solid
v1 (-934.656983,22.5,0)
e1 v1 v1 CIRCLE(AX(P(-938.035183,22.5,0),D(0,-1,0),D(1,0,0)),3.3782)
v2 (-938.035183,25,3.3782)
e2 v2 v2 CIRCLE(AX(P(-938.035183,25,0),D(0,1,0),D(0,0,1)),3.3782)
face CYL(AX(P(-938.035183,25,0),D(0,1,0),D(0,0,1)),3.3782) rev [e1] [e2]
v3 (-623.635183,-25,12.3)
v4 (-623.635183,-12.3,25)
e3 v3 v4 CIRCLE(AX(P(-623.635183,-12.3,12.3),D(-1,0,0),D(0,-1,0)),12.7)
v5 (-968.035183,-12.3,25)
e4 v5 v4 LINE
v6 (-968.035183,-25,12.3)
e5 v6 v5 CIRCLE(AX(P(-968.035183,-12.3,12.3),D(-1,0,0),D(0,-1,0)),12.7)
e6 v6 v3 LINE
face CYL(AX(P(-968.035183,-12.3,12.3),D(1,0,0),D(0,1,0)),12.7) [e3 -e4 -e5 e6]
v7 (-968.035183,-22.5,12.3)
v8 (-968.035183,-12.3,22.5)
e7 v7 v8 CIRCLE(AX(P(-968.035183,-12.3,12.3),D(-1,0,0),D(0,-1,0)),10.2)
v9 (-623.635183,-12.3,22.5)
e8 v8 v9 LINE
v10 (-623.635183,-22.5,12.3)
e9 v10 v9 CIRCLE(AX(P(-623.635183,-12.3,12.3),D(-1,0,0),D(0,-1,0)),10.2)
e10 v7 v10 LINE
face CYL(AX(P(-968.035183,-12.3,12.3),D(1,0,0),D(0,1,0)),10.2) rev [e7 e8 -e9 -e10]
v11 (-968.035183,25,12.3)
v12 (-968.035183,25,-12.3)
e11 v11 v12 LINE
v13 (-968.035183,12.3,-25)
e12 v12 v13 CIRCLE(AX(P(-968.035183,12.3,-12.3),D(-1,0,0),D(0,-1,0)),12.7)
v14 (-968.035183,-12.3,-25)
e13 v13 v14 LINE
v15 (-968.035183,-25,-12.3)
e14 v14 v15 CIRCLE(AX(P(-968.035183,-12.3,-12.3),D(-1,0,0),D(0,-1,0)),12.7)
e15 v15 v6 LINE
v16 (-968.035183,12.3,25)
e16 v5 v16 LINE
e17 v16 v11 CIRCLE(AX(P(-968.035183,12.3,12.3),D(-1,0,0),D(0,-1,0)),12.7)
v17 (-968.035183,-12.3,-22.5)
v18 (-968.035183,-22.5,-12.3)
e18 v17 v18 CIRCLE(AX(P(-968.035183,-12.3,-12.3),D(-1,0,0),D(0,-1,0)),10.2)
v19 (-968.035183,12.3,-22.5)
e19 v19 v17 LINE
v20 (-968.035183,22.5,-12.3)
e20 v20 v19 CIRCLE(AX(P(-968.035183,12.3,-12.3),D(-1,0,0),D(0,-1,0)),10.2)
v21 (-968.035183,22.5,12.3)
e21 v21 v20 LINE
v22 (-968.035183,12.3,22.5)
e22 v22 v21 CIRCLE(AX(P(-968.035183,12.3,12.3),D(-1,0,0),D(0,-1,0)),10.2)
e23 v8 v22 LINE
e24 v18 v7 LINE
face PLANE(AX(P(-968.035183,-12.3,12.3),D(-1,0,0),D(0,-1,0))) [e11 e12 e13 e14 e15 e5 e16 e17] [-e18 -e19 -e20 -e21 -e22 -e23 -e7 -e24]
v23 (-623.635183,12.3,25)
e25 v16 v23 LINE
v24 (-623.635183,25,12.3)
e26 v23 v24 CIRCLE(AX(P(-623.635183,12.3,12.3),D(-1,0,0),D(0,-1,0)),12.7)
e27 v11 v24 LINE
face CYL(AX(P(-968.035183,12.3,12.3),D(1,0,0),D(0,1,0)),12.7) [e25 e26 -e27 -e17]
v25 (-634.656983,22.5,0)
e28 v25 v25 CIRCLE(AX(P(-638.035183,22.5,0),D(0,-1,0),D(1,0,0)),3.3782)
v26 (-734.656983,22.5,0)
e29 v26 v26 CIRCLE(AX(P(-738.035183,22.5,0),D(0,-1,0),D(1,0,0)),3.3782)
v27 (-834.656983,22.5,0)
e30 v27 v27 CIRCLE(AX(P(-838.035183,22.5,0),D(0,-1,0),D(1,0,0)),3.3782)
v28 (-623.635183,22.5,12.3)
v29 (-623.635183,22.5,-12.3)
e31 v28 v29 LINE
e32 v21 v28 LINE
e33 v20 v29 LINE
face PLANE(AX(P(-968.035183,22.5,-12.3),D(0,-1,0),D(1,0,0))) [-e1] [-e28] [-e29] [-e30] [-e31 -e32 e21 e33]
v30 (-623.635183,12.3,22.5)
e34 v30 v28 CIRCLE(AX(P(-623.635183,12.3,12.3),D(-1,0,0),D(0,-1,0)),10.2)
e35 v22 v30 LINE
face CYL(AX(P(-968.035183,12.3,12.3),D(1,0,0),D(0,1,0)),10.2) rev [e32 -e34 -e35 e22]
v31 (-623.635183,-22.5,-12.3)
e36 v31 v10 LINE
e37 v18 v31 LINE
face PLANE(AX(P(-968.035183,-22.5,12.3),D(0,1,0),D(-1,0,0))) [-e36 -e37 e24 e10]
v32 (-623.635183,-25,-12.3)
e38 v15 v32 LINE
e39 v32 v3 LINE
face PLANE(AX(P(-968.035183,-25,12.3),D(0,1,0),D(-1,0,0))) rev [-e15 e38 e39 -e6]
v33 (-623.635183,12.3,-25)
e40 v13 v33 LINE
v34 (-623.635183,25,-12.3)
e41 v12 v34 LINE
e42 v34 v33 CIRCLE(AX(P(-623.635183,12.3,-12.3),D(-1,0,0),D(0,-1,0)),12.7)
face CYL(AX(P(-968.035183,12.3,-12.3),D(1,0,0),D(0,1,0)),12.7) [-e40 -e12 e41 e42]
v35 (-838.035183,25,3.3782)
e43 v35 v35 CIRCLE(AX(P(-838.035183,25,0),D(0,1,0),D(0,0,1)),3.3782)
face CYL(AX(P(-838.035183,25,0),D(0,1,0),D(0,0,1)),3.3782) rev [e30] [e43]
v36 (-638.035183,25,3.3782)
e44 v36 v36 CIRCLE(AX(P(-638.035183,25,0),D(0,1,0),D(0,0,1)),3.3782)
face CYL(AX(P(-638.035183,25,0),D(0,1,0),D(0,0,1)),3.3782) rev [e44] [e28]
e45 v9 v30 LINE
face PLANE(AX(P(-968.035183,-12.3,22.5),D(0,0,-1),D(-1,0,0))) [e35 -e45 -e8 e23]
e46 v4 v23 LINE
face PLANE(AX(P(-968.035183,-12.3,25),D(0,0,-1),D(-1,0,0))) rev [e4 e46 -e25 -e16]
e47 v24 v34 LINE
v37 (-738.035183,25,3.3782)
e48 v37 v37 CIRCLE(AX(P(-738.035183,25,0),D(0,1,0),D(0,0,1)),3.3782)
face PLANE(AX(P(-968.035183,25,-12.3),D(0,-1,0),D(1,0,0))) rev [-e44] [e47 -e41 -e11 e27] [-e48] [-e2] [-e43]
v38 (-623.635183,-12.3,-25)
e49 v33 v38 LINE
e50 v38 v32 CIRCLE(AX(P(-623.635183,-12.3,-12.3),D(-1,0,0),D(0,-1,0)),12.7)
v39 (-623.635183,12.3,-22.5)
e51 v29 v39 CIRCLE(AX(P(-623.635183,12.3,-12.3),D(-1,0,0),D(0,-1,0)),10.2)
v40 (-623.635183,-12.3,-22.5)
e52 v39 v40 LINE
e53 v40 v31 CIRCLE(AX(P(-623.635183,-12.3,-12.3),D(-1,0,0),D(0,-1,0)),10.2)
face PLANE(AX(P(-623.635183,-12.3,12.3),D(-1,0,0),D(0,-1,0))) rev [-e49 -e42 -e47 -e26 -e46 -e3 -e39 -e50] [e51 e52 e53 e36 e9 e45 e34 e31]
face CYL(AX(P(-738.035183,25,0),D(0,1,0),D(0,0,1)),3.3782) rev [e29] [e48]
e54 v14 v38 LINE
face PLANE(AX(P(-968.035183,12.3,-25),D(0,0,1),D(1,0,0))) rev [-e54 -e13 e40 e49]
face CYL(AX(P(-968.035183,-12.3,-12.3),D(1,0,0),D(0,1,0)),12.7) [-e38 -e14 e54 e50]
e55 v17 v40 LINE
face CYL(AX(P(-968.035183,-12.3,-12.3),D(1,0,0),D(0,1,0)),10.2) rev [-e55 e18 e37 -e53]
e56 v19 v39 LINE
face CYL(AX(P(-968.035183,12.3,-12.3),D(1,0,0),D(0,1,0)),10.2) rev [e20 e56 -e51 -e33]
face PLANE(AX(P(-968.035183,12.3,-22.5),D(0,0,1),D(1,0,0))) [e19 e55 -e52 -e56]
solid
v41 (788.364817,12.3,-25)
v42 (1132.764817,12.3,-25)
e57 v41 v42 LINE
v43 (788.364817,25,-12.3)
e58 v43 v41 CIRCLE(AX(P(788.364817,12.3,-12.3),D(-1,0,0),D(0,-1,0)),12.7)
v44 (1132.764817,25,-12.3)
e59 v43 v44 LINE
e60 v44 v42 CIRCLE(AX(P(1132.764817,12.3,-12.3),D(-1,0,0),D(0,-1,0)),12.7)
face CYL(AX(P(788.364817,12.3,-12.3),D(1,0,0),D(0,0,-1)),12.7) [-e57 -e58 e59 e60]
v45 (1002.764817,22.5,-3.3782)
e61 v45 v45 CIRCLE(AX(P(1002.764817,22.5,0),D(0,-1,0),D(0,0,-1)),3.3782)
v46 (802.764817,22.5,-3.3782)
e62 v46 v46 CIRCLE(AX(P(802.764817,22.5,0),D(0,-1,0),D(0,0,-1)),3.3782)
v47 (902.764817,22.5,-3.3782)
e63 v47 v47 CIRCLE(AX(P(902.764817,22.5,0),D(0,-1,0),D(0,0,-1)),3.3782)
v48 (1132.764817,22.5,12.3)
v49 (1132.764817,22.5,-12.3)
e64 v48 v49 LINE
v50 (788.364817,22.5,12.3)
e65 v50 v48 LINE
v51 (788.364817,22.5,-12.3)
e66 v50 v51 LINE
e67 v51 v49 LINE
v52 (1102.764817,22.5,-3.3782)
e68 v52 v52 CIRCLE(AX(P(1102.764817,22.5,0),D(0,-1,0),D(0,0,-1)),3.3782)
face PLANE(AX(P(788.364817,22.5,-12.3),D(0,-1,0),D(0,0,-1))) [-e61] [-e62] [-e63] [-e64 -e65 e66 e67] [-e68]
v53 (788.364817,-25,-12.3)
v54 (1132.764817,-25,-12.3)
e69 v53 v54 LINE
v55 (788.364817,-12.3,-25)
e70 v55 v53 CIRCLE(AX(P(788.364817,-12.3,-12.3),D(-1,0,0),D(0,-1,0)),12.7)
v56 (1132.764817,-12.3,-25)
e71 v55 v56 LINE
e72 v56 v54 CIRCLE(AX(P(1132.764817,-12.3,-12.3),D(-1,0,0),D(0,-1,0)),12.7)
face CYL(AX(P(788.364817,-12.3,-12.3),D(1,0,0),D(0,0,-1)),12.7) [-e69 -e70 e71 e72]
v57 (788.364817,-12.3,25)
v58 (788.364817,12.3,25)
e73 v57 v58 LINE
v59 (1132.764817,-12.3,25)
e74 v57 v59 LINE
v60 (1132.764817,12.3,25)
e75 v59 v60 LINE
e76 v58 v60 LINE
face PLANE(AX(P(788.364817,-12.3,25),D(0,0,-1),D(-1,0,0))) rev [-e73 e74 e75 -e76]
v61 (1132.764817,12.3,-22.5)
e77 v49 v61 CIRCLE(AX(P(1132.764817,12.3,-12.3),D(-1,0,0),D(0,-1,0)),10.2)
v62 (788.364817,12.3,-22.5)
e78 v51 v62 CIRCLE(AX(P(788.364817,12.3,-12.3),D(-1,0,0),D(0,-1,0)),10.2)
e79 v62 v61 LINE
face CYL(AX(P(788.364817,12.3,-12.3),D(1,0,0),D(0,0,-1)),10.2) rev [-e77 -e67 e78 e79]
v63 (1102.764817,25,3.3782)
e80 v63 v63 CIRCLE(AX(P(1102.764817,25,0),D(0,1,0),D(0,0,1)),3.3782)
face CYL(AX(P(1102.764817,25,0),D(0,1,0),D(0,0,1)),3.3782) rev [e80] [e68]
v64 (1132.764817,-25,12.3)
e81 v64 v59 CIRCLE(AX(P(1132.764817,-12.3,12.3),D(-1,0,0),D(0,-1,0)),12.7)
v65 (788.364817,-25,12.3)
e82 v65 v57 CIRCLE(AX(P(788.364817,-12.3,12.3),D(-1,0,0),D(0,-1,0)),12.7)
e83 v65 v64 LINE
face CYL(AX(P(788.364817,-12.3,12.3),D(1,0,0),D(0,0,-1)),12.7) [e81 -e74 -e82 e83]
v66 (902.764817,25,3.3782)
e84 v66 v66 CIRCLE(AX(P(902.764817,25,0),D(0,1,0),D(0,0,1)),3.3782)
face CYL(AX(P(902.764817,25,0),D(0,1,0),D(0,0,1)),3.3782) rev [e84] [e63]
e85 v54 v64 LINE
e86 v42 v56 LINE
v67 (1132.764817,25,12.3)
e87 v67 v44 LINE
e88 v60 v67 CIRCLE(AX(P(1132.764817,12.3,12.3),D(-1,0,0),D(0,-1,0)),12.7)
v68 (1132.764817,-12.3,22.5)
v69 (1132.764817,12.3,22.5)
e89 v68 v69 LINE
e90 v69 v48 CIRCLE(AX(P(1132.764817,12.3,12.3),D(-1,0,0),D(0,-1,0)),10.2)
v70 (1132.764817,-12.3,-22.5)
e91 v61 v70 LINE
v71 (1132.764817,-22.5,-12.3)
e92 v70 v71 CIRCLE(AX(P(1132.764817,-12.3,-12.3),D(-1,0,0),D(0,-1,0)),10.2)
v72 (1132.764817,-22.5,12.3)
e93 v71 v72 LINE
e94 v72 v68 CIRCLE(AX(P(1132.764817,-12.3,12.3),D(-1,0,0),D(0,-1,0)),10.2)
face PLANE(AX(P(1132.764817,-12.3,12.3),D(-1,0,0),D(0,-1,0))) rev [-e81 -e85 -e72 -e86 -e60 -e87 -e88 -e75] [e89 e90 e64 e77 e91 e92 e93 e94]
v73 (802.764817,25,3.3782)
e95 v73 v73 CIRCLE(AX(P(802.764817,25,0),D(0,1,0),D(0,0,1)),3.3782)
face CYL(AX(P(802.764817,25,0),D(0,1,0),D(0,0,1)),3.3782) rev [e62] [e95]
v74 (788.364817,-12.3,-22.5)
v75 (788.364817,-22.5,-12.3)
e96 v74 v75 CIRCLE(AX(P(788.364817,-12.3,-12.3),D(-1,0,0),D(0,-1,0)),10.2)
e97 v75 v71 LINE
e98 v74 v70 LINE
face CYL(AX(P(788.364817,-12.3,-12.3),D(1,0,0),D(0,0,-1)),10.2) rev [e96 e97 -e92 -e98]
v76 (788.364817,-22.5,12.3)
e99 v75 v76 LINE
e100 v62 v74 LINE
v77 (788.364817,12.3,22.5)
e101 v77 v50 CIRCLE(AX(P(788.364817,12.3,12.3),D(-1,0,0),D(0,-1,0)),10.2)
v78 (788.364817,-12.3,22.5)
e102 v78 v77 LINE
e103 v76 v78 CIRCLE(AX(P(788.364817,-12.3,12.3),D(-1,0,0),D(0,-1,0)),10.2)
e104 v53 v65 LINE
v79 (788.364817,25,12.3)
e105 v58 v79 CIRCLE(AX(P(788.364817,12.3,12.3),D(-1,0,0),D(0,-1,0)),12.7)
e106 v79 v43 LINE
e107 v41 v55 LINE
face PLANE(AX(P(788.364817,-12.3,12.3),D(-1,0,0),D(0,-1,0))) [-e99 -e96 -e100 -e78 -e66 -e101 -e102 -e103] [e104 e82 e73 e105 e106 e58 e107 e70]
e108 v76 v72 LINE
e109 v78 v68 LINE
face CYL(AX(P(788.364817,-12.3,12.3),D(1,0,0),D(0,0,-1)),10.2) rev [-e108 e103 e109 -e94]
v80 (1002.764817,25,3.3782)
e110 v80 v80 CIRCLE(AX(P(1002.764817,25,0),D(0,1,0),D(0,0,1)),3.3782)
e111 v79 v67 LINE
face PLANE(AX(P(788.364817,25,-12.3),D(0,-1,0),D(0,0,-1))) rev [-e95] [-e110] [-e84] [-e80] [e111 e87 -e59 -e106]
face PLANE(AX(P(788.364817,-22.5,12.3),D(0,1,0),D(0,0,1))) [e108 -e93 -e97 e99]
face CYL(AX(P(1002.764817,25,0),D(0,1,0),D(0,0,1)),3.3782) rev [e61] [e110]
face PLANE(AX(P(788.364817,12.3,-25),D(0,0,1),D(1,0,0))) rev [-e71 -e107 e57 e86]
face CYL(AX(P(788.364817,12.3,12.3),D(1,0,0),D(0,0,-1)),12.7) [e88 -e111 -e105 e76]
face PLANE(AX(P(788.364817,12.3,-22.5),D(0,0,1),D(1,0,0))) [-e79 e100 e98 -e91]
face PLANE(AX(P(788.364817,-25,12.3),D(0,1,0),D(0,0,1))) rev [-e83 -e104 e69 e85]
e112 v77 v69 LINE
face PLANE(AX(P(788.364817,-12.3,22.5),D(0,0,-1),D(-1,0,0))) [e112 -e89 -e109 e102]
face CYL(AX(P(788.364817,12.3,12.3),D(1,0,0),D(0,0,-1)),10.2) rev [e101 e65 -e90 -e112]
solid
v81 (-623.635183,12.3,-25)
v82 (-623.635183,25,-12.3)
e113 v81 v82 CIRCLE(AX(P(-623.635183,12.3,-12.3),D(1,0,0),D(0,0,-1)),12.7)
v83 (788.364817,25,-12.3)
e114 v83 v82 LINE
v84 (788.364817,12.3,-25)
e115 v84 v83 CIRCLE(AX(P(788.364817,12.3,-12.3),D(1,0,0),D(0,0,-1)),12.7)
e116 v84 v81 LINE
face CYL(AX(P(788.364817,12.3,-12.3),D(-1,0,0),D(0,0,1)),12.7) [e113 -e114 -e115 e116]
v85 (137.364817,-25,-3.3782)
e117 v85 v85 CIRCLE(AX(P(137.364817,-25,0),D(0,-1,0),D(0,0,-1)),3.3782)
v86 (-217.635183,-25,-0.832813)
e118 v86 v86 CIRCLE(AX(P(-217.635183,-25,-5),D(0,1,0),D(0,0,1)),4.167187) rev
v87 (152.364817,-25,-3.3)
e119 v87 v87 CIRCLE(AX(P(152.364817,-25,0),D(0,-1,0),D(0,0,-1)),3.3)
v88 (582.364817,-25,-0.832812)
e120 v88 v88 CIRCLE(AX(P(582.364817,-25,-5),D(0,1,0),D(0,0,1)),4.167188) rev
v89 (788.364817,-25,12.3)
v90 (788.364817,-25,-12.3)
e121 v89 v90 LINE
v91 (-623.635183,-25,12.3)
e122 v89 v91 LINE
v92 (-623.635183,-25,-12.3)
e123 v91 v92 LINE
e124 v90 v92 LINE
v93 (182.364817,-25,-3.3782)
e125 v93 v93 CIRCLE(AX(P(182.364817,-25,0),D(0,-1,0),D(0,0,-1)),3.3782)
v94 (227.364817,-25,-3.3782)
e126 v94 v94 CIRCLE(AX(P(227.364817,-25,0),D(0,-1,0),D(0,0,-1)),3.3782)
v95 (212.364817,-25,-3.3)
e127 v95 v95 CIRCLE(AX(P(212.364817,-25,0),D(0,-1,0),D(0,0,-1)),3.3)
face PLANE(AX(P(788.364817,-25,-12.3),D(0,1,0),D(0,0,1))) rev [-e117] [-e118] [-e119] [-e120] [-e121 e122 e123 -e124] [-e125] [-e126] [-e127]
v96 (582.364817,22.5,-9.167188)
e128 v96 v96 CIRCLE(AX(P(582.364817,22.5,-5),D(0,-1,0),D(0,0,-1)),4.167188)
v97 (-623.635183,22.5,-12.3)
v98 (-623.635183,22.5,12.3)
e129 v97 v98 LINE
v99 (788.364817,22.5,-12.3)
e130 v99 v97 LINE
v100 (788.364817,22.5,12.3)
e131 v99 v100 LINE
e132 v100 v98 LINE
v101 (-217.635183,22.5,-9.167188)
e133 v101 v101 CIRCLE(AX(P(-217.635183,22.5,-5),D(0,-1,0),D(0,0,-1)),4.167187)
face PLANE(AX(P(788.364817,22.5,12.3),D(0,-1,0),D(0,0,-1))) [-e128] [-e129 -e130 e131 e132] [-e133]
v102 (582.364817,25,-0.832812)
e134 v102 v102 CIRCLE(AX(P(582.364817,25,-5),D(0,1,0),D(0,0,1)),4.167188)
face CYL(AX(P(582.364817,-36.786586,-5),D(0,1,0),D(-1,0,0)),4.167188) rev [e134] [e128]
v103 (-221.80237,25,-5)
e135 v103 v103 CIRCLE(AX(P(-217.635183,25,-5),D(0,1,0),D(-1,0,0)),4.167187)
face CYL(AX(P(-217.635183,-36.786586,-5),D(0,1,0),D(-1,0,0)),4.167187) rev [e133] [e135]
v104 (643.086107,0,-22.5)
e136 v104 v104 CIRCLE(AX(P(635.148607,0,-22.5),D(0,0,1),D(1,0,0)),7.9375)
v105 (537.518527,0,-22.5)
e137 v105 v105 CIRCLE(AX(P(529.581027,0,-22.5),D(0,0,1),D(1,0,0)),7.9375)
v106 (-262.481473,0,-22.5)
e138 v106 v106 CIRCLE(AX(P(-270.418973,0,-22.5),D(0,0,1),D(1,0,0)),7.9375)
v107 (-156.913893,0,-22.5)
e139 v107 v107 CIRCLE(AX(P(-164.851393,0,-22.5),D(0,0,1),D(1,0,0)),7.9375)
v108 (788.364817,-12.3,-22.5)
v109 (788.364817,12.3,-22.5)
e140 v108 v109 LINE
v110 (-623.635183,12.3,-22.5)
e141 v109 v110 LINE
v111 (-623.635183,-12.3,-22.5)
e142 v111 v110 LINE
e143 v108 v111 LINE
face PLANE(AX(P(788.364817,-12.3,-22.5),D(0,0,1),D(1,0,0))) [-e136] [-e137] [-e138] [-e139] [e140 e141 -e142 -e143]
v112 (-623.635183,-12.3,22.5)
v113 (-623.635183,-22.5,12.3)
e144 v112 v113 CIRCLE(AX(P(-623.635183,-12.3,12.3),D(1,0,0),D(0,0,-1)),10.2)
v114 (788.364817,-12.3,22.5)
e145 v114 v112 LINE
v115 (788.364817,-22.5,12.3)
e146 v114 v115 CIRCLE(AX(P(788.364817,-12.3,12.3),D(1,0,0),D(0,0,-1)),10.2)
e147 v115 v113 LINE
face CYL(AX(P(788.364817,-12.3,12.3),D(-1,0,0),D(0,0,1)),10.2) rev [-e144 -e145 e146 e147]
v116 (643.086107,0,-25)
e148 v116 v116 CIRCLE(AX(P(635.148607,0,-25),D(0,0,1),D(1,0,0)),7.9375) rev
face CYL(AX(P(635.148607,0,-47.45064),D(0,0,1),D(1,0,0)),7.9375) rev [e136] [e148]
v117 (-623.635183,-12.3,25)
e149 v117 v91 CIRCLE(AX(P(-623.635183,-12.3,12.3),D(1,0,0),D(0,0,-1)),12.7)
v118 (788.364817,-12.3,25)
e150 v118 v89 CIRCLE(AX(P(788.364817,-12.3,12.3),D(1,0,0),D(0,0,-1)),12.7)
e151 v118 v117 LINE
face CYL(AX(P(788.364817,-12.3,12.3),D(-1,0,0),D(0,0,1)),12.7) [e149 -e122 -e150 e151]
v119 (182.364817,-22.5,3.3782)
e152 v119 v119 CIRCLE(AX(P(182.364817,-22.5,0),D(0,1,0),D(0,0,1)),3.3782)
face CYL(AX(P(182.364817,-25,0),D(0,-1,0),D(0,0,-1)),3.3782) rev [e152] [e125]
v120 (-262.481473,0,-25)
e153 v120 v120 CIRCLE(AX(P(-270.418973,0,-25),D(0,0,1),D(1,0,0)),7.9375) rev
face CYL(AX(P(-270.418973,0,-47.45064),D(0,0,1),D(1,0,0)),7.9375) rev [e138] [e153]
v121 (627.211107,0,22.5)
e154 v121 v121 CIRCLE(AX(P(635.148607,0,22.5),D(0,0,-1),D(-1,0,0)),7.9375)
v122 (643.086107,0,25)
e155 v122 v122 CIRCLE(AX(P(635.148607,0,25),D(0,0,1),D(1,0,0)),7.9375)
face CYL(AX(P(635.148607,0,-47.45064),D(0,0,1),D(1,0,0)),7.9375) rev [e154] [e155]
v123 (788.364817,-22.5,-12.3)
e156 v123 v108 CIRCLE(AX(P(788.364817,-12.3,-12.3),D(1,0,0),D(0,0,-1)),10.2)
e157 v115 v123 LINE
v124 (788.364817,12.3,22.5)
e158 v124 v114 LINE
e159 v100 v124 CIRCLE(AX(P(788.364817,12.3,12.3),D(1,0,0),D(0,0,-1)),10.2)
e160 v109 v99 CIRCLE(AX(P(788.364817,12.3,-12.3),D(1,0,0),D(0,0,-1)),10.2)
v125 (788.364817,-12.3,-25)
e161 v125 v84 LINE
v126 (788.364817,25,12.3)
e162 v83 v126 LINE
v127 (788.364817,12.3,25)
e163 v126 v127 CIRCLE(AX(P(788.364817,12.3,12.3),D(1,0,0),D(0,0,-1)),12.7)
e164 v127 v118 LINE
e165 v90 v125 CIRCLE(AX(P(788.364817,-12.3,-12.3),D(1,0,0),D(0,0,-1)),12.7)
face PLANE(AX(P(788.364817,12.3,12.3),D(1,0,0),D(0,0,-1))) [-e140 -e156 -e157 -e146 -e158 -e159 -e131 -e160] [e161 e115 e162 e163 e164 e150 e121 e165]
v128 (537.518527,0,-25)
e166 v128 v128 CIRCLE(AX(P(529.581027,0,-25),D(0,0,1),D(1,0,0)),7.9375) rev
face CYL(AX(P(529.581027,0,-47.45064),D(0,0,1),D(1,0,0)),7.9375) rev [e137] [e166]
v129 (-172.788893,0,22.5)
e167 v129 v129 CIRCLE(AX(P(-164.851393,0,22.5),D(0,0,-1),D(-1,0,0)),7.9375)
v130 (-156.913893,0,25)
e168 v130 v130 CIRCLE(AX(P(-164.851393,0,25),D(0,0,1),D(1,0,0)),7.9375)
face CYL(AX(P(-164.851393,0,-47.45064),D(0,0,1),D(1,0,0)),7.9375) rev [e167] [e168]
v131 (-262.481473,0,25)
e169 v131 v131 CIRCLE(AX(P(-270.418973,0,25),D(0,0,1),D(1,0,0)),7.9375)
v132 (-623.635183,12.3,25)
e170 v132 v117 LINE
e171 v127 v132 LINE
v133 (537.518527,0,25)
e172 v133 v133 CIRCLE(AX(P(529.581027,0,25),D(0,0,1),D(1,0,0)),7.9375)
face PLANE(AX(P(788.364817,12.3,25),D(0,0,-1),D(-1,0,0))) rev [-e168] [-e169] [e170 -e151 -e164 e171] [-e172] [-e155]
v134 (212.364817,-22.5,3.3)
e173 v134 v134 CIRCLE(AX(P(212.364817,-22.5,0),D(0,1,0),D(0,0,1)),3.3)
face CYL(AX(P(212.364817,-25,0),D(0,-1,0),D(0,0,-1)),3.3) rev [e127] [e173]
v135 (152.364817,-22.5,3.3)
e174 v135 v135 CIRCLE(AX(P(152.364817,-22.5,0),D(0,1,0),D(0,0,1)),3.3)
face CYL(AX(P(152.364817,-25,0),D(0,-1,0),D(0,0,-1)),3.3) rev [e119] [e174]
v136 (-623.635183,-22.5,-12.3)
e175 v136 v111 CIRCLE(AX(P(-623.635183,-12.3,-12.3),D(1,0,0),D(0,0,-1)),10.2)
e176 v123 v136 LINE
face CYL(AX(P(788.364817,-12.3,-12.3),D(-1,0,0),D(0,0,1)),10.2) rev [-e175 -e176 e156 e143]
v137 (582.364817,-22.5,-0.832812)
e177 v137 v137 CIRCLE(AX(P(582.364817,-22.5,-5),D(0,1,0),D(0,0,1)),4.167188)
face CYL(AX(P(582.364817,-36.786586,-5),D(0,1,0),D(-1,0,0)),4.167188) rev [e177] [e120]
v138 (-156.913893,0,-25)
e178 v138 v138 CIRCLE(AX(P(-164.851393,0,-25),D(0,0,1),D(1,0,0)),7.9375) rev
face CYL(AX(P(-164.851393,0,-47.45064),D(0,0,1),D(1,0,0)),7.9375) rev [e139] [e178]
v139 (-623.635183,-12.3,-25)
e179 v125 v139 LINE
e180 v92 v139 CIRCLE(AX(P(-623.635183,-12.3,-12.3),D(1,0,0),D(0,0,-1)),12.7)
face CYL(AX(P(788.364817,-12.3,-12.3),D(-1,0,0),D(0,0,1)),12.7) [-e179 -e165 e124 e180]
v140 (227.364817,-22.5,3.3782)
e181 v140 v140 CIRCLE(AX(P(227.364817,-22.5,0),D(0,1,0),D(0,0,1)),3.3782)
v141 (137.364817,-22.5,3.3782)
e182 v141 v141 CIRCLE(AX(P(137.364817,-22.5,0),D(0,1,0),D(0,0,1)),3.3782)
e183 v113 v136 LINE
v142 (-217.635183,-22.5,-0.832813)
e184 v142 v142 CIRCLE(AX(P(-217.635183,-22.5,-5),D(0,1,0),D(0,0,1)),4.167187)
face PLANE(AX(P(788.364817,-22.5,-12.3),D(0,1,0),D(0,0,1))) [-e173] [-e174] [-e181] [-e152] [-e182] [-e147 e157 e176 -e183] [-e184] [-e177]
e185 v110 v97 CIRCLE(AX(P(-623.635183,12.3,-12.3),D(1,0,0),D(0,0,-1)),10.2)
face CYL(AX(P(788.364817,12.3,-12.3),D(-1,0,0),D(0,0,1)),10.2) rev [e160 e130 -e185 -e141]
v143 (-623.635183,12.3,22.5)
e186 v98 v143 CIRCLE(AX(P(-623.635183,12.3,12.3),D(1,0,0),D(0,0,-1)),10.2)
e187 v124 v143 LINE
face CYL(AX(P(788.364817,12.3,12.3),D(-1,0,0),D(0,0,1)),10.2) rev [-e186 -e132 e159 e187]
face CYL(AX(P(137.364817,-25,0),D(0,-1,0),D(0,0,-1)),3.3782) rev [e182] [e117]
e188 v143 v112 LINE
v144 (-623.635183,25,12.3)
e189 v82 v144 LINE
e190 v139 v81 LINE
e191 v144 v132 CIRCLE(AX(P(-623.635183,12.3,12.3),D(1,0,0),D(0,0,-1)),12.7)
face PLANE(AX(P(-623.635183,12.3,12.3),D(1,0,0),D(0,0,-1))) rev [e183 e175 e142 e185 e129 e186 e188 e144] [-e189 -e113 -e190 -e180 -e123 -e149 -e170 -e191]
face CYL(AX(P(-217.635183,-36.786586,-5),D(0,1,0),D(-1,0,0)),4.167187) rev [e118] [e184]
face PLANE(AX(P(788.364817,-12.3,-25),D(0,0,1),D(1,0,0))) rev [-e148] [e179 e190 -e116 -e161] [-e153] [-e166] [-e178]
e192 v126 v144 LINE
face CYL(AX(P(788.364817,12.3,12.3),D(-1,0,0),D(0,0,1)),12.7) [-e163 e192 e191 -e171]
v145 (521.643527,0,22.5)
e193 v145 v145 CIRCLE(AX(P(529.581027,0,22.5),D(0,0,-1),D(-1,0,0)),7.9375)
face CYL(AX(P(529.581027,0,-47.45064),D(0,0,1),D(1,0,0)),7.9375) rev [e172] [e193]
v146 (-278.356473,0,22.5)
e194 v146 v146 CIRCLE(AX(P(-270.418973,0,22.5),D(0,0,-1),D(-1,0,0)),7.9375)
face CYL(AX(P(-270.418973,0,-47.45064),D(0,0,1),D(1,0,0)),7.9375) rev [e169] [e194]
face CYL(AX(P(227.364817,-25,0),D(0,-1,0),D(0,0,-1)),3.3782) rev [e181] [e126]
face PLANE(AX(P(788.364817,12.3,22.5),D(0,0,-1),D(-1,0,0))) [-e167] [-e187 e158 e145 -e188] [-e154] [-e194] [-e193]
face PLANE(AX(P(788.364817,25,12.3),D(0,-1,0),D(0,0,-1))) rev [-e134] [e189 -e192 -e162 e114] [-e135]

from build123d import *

# Parameters (mm, degrees)
MIEMBRO_ESTRUCTURAL1_DEPTH             = 1412
TALADRO_DE_MARGEN_PARA_M61_D           = 6.6
TALADRO_DE_MARGEN_PARA_M61_DEPTH       = 2.5
MIEMBRO_ESTRUCTURAL2_DEPTH             = 344.4
MIEMBRO_ESTRUCTURAL2_2_DEPTH           = 344.4
CROQUIS7_W                             = 3.3782
CROQUIS7_H                             = 2.5
TALADRO_DE_MARGEN_PARA_1_41_AT_2_COUNT = 2
TALADRO_DE_MARGEN_PARA_1_41_AT_2_PITCH = 45
TALADRO_DE_MARGEN_PARA_1_41_AT_3_COUNT = 2
TALADRO_DE_MARGEN_PARA_1_41_AT_3_PITCH = 90
TALADRO_START                          = 22.5
TALADRO_DE_MARGEN_PARA_1_42_OUTLINE_R  = 3.3782
TALADRO_DE_MARGEN_PARA_1_42_DEPTH      = 2.5
CUT_EXTRUDE1_REACH                     = 1136.143
SKETCH12_R                             = 7.9375
CUT_EXTRUDE2_REACH                     = 1136.143
SKETCH15_R                             = 4.1671875


# Read off the part's stored shape, not the designer's step: Taladro de margen para 1/42
with BuildPart() as part:
    # Sketch1 → Miembro estructural1 (new body)
    with BuildSketch(Plane.YZ.offset(-623.635182539)):
        with BuildLine():
            Line((-12.3, -25), (12.3, -25))
            ThreePointArc((12.3, -25), (21.280256121, -21.280256121), (25, -12.3))
            Line((25, -12.3), (25, 12.3))
            ThreePointArc((25, 12.3), (21.280256121, 21.280256121), (12.3, 25))
            Line((12.3, 25), (-12.3, 25))
            ThreePointArc((-12.3, 25), (-21.280256121, 21.280256121), (-25, 12.3))
            Line((-25, 12.3), (-25, -12.3))
            ThreePointArc((-25, -12.3), (-21.280256121, -21.280256121), (-12.3, -25))
        make_face()
        with BuildLine():
            Line((-12.3, -22.5), (12.3, -22.5))
            ThreePointArc((12.3, -22.5), (19.512489168, -19.512489168), (22.5, -12.3))
            Line((22.5, -12.3), (22.5, 12.3))
            ThreePointArc((22.5, 12.3), (19.512489168, 19.512489168), (12.3, 22.5))
            Line((12.3, 22.5), (-12.3, 22.5))
            ThreePointArc((-12.3, 22.5), (-19.512489168, 19.512489168), (-22.5, 12.3))
            Line((-22.5, 12.3), (-22.5, -12.3))
            ThreePointArc((-22.5, -12.3), (-19.512489168, -19.512489168), (-12.3, -22.5))
        make_face(mode=Mode.SUBTRACT)
    extrude(amount=MIEMBRO_ESTRUCTURAL1_DEPTH)

    # Taladro de margen para M61
    with Locations(Plane(origin=(0, -25, 0), x_dir=(-1, 0, 0), z_dir=(0, -1, 0))):
        with Locations((-152.364817461, 0), (-212.364817461, 0)):
            Hole(TALADRO_DE_MARGEN_PARA_M61_D / 2, depth=TALADRO_DE_MARGEN_PARA_M61_DEPTH)

    # Croquis7 → Taladro de margen para 1/41 (revolve, cut)
    with BuildSketch(Plane(origin=(137.364817461, -25, 0), x_dir=(0, 0, -1), z_dir=(1, 0, 0))):
        with Locations((1.6891, 1.25)):
            Rectangle(CROQUIS7_W, CROQUIS7_H)
    taladro_de_margen_para_1_41 = revolve(axis=Axis((137.364817461, -31.35, 0), (0, 1, 0)), mode=Mode.SUBTRACT)

    # Taladro de margen para 1/41 at 2: Taladro de margen para 1/41 ×2
    with Locations(*[(i * TALADRO_DE_MARGEN_PARA_1_41_AT_2_PITCH, 0, 0) for i in range(1, TALADRO_DE_MARGEN_PARA_1_41_AT_2_COUNT)]):
        add(taladro_de_margen_para_1_41, mode=Mode.SUBTRACT)

    # Taladro de margen para 1/41 at 3: Taladro de margen para 1/41 ×2
    with Locations(*[(i * TALADRO_DE_MARGEN_PARA_1_41_AT_3_PITCH, 0, 0) for i in range(1, TALADRO_DE_MARGEN_PARA_1_41_AT_3_COUNT)]):
        add(taladro_de_margen_para_1_41, mode=Mode.SUBTRACT)

    # Cut-Extrude1: up to this face of the body (flat: up to its plane)
    cut_extrude1_end = Plane(part.part.faces().sort_by_distance((82.364817461, 0, -25))[0])
    # Sketch12 → Cut-Extrude1 (cut, up to the picked face)
    with BuildSketch(Plane.XY.offset(25), mode=Mode.PRIVATE) as cut_extrude1_sk1:
        with Locations((-270.418972539, 0)):
            Circle(SKETCH12_R)
    cut_extrude1_tool1 = split(extrude(cut_extrude1_sk1.sketch, amount=-CUT_EXTRUDE1_REACH, mode=Mode.PRIVATE), bisect_by=cut_extrude1_end, keep=Keep.BOTH, mode=Mode.PRIVATE)
    # Sketch12 → Cut-Extrude1 (cut, up to the picked face)
    with BuildSketch(Plane.XY.offset(25), mode=Mode.PRIVATE) as cut_extrude1_sk2:
        with Locations((635.148607461, 0)):
            Circle(SKETCH12_R)
    cut_extrude1_tool2 = split(extrude(cut_extrude1_sk2.sketch, amount=-CUT_EXTRUDE1_REACH, mode=Mode.PRIVATE), bisect_by=cut_extrude1_end, keep=Keep.BOTH, mode=Mode.PRIVATE)
    # Sketch12 → Cut-Extrude1 (cut, up to the picked face)
    with BuildSketch(Plane.XY.offset(25), mode=Mode.PRIVATE) as cut_extrude1_sk3:
        with Locations((529.581027461, 0)):
            Circle(SKETCH12_R)
    cut_extrude1_tool3 = split(extrude(cut_extrude1_sk3.sketch, amount=-CUT_EXTRUDE1_REACH, mode=Mode.PRIVATE), bisect_by=cut_extrude1_end, keep=Keep.BOTH, mode=Mode.PRIVATE)
    # Sketch12 → Cut-Extrude1 (cut, up to the picked face)
    with BuildSketch(Plane.XY.offset(25), mode=Mode.PRIVATE) as cut_extrude1_sk4:
        with Locations((-164.851392539, 0)):
            Circle(SKETCH12_R)
    cut_extrude1_tool4 = split(extrude(cut_extrude1_sk4.sketch, amount=-CUT_EXTRUDE1_REACH, mode=Mode.PRIVATE), bisect_by=cut_extrude1_end, keep=Keep.BOTH, mode=Mode.PRIVATE)
    add(cut_extrude1_tool1.solids().sort_by(Axis((-270.418973, 0, 25), (0, 0, -1)))[0], mode=Mode.SUBTRACT)
    add(cut_extrude1_tool2.solids().sort_by(Axis((635.148607, 0, 25), (0, 0, -1)))[0], mode=Mode.SUBTRACT)
    add(cut_extrude1_tool3.solids().sort_by(Axis((529.581027, 0, 25), (0, 0, -1)))[0], mode=Mode.SUBTRACT)
    add(cut_extrude1_tool4.solids().sort_by(Axis((-164.851393, 0, 25), (0, 0, -1)))[0], mode=Mode.SUBTRACT)

    # Cut-Extrude2: up to this face of the body (flat: up to its plane)
    cut_extrude2_end = Plane(part.part.faces().sort_by_distance((81.85559972, -25, 0))[0])
    # Sketch15 → Cut-Extrude2 (cut, up to the picked face)
    with BuildSketch(Plane(origin=(0, 25, 0), x_dir=(-1, 0, 0), z_dir=(0, 1, 0)), mode=Mode.PRIVATE) as cut_extrude2_sk1:
        with Locations(Location((-582.364817461, -5, 0), (0, 0, 90))):
            Circle(SKETCH15_R)
    cut_extrude2_tool1 = split(extrude(cut_extrude2_sk1.sketch, amount=-CUT_EXTRUDE2_REACH, mode=Mode.PRIVATE), bisect_by=cut_extrude2_end, keep=Keep.BOTH, mode=Mode.PRIVATE)
    # Sketch15 → Cut-Extrude2 (cut, up to the picked face)
    with BuildSketch(Plane(origin=(0, 25, 0), x_dir=(-1, 0, 0), z_dir=(0, 1, 0)), mode=Mode.PRIVATE) as cut_extrude2_sk2:
        with Locations((217.635182539, -5)):
            Circle(SKETCH15_R)
    cut_extrude2_tool2 = split(extrude(cut_extrude2_sk2.sketch, amount=-CUT_EXTRUDE2_REACH, mode=Mode.PRIVATE), bisect_by=cut_extrude2_end, keep=Keep.BOTH, mode=Mode.PRIVATE)
    add(cut_extrude2_tool1.solids().sort_by(Axis((582.364817, 25, -5), (0, -1, 0)))[0], mode=Mode.SUBTRACT)
    add(cut_extrude2_tool2.solids().sort_by(Axis((-217.635183, 25, -5), (0, -1, 0)))[0], mode=Mode.SUBTRACT)


with BuildPart() as body_2:
    # Sketch11 → Miembro estructural2 (new body)
    with BuildSketch(Plane(origin=(-623.635182539, 0, 0), x_dir=(0, -1, 0), z_dir=(-1, 0, 0))):
        with BuildLine():
            Line((-12.3, -25), (12.3, -25))
            ThreePointArc((12.3, -25), (21.280256121, -21.280256121), (25, -12.3))
            Line((25, -12.3), (25, 12.3))
            ThreePointArc((25, 12.3), (21.280256121, 21.280256121), (12.3, 25))
            Line((12.3, 25), (-12.3, 25))
            ThreePointArc((-12.3, 25), (-21.280256121, 21.280256121), (-25, 12.3))
            Line((-25, 12.3), (-25, -12.3))
            ThreePointArc((-25, -12.3), (-21.280256121, -21.280256121), (-12.3, -25))
        make_face()
        with BuildLine():
            Line((-12.3, -22.5), (12.3, -22.5))
            ThreePointArc((12.3, -22.5), (19.512489168, -19.512489168), (22.5, -12.3))
            Line((22.5, -12.3), (22.5, 12.3))
            ThreePointArc((22.5, 12.3), (19.512489168, 19.512489168), (12.3, 22.5))
            Line((12.3, 22.5), (-12.3, 22.5))
            ThreePointArc((-12.3, 22.5), (-19.512489168, 19.512489168), (-22.5, 12.3))
            Line((-22.5, 12.3), (-22.5, -12.3))
            ThreePointArc((-22.5, -12.3), (-19.512489168, -19.512489168), (-12.3, -22.5))
        make_face(mode=Mode.SUBTRACT)
    extrude(amount=MIEMBRO_ESTRUCTURAL2_DEPTH)


with BuildPart() as body_3:
    # Sketch11 on segment 2 (carried to segment 2) → Miembro estructural2 2 (new body)
    with BuildSketch(Plane(origin=(1132.764817461, 0, 0), x_dir=(0, -1, 0), z_dir=(-1, 0, 0))):
        with BuildLine():
            Line((-12.3, -25), (12.3, -25))
            ThreePointArc((12.3, -25), (21.280256121, -21.280256121), (25, -12.3))
            Line((25, -12.3), (25, 12.3))
            ThreePointArc((25, 12.3), (21.280256121, 21.280256121), (12.3, 25))
            Line((12.3, 25), (-12.3, 25))
            ThreePointArc((-12.3, 25), (-21.280256121, 21.280256121), (-25, 12.3))
            Line((-25, 12.3), (-25, -12.3))
            ThreePointArc((-25, -12.3), (-21.280256121, -21.280256121), (-12.3, -25))
        make_face()
        with BuildLine():
            Line((-12.3, -22.5), (12.3, -22.5))
            ThreePointArc((12.3, -22.5), (19.512489168, -19.512489168), (22.5, -12.3))
            Line((22.5, -12.3), (22.5, 12.3))
            ThreePointArc((22.5, 12.3), (19.512489168, 19.512489168), (12.3, 22.5))
            Line((12.3, 22.5), (-12.3, 22.5))
            ThreePointArc((-12.3, 22.5), (-19.512489168, 19.512489168), (-22.5, 12.3))
            Line((-22.5, 12.3), (-22.5, -12.3))
            ThreePointArc((-22.5, -12.3), (-19.512489168, -19.512489168), (-12.3, -22.5))
        make_face(mode=Mode.SUBTRACT)
    extrude(amount=MIEMBRO_ESTRUCTURAL2_2_DEPTH)


with BuildPart() as taladro_de_margen_para_1_42_tool:
    # Taladro de margen para 1/42 outline → Taladro de margen para 1/42 (new body)
    with BuildSketch(Plane(origin=(0, 0, 0), x_dir=(1, 0, 0), z_dir=(0, 1, 0)).offset(TALADRO_START)):
        with Locations((1102.764817461, 0)):
            Circle(TALADRO_DE_MARGEN_PARA_1_42_OUTLINE_R)
        with Locations((1002.764817461, 0)):
            Circle(TALADRO_DE_MARGEN_PARA_1_42_OUTLINE_R)
        with Locations((902.764817461, 0)):
            Circle(TALADRO_DE_MARGEN_PARA_1_42_OUTLINE_R)
        with Locations((802.764817461, 0)):
            Circle(TALADRO_DE_MARGEN_PARA_1_42_OUTLINE_R)
        with Locations((-638.035182539, 0)):
            Circle(TALADRO_DE_MARGEN_PARA_1_42_OUTLINE_R)
        with Locations((-738.035182539, 0)):
            Circle(TALADRO_DE_MARGEN_PARA_1_42_OUTLINE_R)
        with Locations((-838.035182539, 0)):
            Circle(TALADRO_DE_MARGEN_PARA_1_42_OUTLINE_R)
        with Locations((-938.035182539, 0)):
            Circle(TALADRO_DE_MARGEN_PARA_1_42_OUTLINE_R)
    extrude(amount=TALADRO_DE_MARGEN_PARA_1_42_DEPTH)


with BuildPart() as body_2_1:
    add(body_2.part)

    # Taladro de margen para 1/42: cut by taladro_de_margen_para_1_42_tool
    add(taladro_de_margen_para_1_42_tool.part, mode=Mode.SUBTRACT)


with BuildPart() as body_3_1:
    add(body_3.part)

    # Taladro de margen para 1/42: cut by taladro_de_margen_para_1_42_tool
    add(taladro_de_margen_para_1_42_tool.part, mode=Mode.SUBTRACT)


solid = Compound([part.part, body_2_1.part, body_3_1.part])
